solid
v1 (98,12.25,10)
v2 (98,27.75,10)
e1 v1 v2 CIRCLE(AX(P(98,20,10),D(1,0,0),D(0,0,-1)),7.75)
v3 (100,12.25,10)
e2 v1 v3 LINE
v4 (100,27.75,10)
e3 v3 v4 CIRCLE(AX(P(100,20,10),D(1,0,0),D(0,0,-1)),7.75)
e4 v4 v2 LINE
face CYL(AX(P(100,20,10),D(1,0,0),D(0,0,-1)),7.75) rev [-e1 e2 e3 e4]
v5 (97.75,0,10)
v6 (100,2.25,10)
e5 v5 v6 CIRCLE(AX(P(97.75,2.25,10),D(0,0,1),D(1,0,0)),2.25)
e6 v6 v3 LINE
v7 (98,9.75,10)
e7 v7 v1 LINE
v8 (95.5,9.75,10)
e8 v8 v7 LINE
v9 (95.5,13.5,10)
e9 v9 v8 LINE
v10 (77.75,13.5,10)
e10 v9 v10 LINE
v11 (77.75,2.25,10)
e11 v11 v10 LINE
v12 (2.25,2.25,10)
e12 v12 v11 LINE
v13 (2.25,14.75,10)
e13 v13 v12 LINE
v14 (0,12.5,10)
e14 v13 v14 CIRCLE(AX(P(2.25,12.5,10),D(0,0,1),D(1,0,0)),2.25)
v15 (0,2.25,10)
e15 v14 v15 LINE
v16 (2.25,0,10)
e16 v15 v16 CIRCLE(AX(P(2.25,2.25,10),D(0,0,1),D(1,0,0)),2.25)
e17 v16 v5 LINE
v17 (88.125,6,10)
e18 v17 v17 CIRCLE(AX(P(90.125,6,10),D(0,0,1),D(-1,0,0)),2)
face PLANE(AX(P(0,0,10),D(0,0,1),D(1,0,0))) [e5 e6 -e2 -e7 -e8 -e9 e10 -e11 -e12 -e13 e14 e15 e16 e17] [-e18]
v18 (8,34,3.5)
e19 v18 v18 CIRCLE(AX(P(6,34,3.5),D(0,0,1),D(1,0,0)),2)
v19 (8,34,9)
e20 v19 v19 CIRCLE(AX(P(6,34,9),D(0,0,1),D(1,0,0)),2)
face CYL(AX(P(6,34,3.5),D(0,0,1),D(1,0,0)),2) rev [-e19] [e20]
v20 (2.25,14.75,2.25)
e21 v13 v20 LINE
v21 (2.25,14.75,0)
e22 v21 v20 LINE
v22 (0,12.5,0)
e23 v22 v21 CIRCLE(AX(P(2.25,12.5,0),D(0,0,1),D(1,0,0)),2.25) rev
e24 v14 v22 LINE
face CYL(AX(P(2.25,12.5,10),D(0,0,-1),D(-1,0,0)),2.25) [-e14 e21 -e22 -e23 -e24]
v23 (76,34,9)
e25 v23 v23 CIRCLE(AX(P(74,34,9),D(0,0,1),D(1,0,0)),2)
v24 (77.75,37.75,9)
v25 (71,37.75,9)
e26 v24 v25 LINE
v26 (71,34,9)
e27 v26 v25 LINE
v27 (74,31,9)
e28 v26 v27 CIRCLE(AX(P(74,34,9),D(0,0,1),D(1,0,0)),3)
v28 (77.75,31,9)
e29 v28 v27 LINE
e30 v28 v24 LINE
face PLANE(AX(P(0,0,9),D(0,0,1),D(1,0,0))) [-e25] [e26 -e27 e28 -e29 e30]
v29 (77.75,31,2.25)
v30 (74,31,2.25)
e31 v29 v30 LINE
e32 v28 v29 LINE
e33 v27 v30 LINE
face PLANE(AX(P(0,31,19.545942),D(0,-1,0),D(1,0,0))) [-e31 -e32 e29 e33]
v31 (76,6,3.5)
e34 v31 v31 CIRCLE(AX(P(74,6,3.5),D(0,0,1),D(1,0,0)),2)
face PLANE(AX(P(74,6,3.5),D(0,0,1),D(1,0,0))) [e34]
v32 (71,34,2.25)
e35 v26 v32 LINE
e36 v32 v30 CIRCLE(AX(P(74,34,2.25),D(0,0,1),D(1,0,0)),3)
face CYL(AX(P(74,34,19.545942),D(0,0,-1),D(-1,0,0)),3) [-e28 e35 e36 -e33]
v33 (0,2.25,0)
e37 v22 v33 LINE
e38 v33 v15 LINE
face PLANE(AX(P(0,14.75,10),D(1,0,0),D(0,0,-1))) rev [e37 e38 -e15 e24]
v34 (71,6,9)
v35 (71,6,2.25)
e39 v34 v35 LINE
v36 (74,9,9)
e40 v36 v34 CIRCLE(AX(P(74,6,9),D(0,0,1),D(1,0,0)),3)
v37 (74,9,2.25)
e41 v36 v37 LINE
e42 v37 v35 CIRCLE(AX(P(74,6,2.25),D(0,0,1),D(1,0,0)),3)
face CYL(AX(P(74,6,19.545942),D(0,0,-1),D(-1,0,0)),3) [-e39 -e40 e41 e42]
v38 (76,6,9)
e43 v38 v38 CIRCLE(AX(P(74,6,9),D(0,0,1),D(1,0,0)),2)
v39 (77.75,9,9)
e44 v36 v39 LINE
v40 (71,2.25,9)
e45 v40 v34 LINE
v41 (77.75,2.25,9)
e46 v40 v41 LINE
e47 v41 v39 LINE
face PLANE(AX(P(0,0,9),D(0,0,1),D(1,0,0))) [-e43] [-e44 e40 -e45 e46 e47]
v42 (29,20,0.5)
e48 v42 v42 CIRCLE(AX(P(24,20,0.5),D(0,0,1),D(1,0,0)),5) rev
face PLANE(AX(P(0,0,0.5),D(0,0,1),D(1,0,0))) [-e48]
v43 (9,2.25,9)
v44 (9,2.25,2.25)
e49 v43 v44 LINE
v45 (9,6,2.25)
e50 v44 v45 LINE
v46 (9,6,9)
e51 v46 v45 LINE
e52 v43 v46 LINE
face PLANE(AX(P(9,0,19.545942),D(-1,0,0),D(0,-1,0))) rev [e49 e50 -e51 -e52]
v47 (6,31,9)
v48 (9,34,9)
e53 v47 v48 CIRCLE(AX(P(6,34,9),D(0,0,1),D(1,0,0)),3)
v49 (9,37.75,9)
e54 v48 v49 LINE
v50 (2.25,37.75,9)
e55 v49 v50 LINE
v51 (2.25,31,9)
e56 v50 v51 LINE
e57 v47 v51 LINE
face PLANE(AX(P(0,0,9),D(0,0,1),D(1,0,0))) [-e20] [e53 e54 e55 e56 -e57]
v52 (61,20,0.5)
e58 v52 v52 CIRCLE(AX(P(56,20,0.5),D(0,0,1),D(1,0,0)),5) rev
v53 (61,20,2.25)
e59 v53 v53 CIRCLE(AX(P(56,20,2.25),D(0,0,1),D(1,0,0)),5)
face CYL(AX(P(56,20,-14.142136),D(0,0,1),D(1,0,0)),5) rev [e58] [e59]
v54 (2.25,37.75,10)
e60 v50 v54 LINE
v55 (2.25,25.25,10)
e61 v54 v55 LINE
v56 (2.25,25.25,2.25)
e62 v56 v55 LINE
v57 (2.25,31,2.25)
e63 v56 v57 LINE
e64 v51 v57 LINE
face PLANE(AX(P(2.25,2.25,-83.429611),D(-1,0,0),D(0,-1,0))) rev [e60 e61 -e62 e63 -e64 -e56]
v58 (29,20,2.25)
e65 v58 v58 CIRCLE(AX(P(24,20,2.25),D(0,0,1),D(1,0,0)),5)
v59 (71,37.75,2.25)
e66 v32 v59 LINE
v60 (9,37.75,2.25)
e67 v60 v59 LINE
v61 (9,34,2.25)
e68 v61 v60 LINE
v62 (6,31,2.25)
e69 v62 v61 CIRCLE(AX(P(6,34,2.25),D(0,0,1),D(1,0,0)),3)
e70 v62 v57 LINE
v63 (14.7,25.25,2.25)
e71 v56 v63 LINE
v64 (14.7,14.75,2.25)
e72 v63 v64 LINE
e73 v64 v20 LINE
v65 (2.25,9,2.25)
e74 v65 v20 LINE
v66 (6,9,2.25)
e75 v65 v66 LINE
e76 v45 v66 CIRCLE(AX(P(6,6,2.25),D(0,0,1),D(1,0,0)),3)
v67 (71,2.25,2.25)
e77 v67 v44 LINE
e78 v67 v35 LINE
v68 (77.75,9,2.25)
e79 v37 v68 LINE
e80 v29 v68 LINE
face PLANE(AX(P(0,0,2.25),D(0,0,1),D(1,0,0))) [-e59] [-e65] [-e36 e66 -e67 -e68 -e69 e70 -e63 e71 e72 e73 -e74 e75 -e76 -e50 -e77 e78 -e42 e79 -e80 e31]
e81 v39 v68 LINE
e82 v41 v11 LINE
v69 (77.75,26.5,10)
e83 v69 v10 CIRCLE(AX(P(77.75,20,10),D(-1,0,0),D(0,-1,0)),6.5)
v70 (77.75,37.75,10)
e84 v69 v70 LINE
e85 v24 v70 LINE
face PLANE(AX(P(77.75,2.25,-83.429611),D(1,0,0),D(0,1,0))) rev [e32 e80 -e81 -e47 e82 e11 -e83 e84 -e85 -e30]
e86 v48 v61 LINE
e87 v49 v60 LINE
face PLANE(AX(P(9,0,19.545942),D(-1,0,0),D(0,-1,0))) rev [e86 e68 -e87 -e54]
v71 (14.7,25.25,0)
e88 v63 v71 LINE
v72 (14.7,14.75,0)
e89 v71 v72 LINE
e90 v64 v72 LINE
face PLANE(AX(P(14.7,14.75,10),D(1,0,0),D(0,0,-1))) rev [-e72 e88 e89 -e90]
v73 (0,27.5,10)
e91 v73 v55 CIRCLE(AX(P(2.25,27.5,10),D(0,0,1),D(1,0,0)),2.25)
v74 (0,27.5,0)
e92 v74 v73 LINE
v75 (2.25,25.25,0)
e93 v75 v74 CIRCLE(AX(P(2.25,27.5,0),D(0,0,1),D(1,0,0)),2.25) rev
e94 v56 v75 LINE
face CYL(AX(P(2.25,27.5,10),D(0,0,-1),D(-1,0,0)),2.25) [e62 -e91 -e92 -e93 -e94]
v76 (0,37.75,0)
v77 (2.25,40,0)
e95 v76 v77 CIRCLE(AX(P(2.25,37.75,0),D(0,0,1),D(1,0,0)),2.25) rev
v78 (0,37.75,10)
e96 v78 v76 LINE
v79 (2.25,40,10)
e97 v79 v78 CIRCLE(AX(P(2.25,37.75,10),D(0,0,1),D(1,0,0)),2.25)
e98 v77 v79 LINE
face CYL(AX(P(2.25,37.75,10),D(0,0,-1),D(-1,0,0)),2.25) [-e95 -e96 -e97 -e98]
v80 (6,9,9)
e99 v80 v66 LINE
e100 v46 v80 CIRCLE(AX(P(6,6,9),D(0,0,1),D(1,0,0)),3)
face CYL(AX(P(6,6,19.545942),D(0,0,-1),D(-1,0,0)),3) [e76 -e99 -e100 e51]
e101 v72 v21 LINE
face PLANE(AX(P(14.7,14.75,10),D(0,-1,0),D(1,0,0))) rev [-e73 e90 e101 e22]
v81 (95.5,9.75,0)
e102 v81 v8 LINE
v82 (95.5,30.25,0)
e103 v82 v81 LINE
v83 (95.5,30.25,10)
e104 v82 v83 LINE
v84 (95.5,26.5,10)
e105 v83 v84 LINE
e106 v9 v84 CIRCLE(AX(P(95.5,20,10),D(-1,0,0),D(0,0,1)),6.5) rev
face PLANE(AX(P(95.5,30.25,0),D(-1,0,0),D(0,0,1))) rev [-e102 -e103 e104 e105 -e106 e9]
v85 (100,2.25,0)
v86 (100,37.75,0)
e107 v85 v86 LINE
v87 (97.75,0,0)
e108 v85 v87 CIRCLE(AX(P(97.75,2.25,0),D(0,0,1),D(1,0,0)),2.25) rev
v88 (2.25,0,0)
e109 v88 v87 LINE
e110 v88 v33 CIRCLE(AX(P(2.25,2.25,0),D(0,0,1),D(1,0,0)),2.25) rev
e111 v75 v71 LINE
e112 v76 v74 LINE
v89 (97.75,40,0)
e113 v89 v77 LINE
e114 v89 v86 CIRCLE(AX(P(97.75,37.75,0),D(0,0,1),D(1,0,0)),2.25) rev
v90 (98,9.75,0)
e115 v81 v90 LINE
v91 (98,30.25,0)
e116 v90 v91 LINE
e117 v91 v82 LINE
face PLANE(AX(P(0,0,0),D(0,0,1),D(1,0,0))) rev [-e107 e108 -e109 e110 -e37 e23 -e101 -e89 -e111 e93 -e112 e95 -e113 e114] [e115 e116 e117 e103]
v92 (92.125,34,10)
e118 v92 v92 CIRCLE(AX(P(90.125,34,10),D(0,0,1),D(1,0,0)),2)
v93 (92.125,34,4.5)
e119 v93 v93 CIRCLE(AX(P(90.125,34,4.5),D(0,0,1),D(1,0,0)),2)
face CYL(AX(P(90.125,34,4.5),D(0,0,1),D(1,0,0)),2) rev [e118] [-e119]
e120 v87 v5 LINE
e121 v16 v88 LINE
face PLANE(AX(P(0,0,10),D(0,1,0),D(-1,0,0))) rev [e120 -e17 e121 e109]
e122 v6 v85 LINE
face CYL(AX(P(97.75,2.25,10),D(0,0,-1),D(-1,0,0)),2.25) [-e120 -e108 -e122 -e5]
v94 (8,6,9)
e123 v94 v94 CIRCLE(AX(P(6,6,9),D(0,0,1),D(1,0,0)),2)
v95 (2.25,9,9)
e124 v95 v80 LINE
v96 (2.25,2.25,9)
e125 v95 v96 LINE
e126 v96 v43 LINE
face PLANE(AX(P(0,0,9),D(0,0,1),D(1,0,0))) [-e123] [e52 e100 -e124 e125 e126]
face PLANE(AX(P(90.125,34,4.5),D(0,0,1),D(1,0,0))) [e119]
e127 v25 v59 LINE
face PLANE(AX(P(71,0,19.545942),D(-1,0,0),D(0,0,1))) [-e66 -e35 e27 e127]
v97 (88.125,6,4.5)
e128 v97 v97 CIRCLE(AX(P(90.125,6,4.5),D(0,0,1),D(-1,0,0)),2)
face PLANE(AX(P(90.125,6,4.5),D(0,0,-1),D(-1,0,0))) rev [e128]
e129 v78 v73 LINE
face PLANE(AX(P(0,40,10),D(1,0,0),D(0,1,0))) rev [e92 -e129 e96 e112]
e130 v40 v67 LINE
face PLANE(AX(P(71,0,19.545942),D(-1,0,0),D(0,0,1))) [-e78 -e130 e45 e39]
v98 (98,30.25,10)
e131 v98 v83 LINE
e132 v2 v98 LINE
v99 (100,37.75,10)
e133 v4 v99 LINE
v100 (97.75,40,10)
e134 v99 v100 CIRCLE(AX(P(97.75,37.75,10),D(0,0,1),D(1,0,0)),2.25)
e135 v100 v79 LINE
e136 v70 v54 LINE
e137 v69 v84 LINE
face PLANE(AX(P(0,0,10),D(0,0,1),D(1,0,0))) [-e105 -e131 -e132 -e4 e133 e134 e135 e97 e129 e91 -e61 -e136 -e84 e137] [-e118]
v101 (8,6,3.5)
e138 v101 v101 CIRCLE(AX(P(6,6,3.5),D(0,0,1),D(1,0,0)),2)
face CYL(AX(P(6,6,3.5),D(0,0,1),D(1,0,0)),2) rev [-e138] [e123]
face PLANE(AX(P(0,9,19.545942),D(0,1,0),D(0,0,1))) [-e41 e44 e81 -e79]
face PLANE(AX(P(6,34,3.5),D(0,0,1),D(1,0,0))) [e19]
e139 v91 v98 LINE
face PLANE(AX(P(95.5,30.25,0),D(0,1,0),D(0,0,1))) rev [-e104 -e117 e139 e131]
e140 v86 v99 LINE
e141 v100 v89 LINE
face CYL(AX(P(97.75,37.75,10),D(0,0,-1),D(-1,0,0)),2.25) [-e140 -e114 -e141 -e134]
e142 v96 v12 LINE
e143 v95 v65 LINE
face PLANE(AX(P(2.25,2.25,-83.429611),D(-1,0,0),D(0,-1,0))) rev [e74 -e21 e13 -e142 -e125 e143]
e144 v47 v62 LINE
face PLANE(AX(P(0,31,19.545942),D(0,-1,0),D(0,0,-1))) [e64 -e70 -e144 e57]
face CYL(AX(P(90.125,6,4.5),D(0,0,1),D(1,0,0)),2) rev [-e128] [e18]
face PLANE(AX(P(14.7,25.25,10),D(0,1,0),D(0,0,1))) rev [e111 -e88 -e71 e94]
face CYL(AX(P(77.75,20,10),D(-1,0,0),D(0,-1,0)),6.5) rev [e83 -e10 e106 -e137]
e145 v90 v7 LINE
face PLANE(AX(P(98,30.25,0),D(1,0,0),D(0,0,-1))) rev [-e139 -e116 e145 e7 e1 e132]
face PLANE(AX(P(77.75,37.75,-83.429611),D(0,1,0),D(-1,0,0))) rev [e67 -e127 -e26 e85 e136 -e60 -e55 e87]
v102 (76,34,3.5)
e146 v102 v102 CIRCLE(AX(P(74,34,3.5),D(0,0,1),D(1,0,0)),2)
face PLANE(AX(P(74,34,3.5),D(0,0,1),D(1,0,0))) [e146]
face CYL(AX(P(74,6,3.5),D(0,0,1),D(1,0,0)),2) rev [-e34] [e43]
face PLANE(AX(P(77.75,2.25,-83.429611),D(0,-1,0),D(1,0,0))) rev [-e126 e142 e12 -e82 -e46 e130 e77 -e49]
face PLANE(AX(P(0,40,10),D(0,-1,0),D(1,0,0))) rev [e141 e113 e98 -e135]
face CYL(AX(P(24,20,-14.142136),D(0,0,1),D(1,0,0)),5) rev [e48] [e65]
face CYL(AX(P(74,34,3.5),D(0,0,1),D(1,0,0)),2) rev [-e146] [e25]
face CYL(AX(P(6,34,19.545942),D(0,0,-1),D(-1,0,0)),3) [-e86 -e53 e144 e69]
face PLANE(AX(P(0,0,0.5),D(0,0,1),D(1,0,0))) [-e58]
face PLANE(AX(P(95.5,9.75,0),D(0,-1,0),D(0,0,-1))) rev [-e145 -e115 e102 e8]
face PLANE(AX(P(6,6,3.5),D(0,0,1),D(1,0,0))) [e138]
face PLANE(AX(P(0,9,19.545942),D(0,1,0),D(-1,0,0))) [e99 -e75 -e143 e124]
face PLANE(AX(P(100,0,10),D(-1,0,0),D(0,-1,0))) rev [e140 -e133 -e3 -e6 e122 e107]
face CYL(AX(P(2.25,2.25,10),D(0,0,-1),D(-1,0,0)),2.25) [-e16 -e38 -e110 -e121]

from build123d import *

# Parameters (mm, degrees)
BODY_DEPTH          = 10
SKETCH10_W          = 75.5
SKETCH10_H          = 35.5
PCB_RECESS_DEPTH    = 7.75
SKETCH11_R          = 3
PCB_BOSS_DEPTH      = 6.75
FILLET2_R           = 2.25
SKETCH12_R          = 2
M3_INSERTS_DEPTH    = 5.5
FILLET3_R           = 2.25
SKETCH27_R          = 5
MAGNETS_DEPTH       = 1.75
SKETCH29_W          = 2
SKETCH29_H          = 7.75
SKETCH30_W          = 2.5
SKETCH30_H          = 20.5
HIROSE_MID_DEPTH    = 109.166538264
SKETCH31_R          = 2
CUT_EXTRUDE14_DEPTH = 5.5
SKETCH32_W          = 17.75
SKETCH32_H          = 6.5


with BuildPart() as part:
    # Sketch4 → body (new body)
    with BuildSketch(Plane.XY):
        Polygon((0, 40), (0, 25.25), (14.7, 25.25), (14.7, 14.75), (0, 14.75), (0, 0), (100, 0), (100, 40), align=None)
    extrude(amount=BODY_DEPTH)

    # Sketch10 → pcb-recess (cut)
    with BuildSketch(Plane.XY.offset(10)):
        with Locations((40, 20)):
            Rectangle(SKETCH10_W, SKETCH10_H)
    extrude(amount=-PCB_RECESS_DEPTH, mode=Mode.SUBTRACT)

    # Sketch11 → pcb-boss (add)
    with BuildSketch(Plane.XY.offset(2.25)):
        with Locations((6, 34)):
            Circle(SKETCH11_R)
        with BuildLine():
            ThreePointArc((6, 31), (3.878679656, 36.121320344), (9, 34))
            Line((9, 34), (9, 37.75))
            Line((9, 37.75), (2.25, 37.75))
            Line((2.25, 37.75), (2.25, 31))
            Line((2.25, 31), (6, 31))
        make_face()
        with BuildLine():
            Line((77.75, 37.75), (71, 37.75))
            Line((71, 37.75), (71, 34))
            ThreePointArc((71, 34), (74, 37), (77, 34))
            ThreePointArc((77, 34), (76.121320344, 31.878679656), (74, 31))
            Line((74, 31), (77.75, 31))
            Line((77.75, 31), (77.75, 37.75))
        make_face()
        with Locations((74, 34)):
            Circle(SKETCH11_R)
        with Locations((74, 6)):
            Circle(SKETCH11_R)
        with BuildLine():
            Line((77.75, 2.25), (77.75, 9))
            Line((77.75, 9), (74, 9))
            ThreePointArc((74, 9), (76.121320344, 8.121320344), (77, 6))
            ThreePointArc((77, 6), (74, 3), (71, 6))
            Line((71, 6), (71, 2.25))
            Line((71, 2.25), (77.75, 2.25))
        make_face()
        with Locations((6, 6)):
            Circle(SKETCH11_R)
        with BuildLine():
            Line((2.25, 2.25), (9, 2.25))
            Line((9, 2.25), (9, 6))
            ThreePointArc((9, 6), (3.878679656, 3.878679656), (6, 9))
            Line((6, 9), (2.25, 9))
            Line((2.25, 9), (2.25, 2.25))
        make_face()
    extrude(amount=PCB_BOSS_DEPTH)

    # Fillet2
    fillet2_edges = [part.edges().sort_by_distance(p)[0] for p in [
        (0, 14.75, 5),
        (0, 25.25, 5),
    ]]
    fillet(fillet2_edges, radius=FILLET2_R - 0.0001)  # a hair under: the kernel refuses the full size

    # Sketch12 → m3-inserts (cut)
    with BuildSketch(Plane.XY.offset(9)):
        with Locations((6, 34)):
            Circle(SKETCH12_R)
        with Locations((74, 34)):
            Circle(SKETCH12_R)
        with Locations((74, 6)):
            Circle(SKETCH12_R)
        with Locations((6, 6)):
            Circle(SKETCH12_R)
    extrude(amount=-M3_INSERTS_DEPTH, mode=Mode.SUBTRACT)

    # Fillet3
    fillet3_edges = [part.edges().sort_by_distance(p)[0] for p in [
        (0, 40, 5),
        (100, 40, 5),
        (100, 0, 5),
        (0, 0, 5),
    ]]
    fillet(fillet3_edges, radius=FILLET3_R)

    # Sketch27 → magnets (cut)
    with BuildSketch(Plane.XY.offset(2.25)):
        with Locations((24, 20)):
            Circle(SKETCH27_R)
        with Locations((56, 20)):
            Circle(SKETCH27_R)
    extrude(amount=-MAGNETS_DEPTH, mode=Mode.SUBTRACT)

    # Sketch29 → hirose-front (revolve, cut)
    with BuildSketch(Plane.XY.offset(10)):
        with Locations((99, 23.875)):
            Rectangle(SKETCH29_W, SKETCH29_H)
    revolve(axis=Axis((100, 20, 10), (-1, 0, 0)), mode=Mode.SUBTRACT)

    # Sketch30 → hirose-mid (cut, through all)
    with BuildSketch(Plane.XY.offset(10)):
        with Locations((96.75, 20)):
            Rectangle(SKETCH30_W, SKETCH30_H)
    extrude(amount=-HIROSE_MID_DEPTH, mode=Mode.SUBTRACT)

    # Sketch31 → Cut-Extrude14 (cut)
    with BuildSketch(Plane.XY.offset(10)):
        with Locations((90.125, 34)):
            Circle(SKETCH31_R)
        with Locations(Location((90.125, 6, 0), (0, 0, 180))):
            Circle(SKETCH31_R)
    extrude(amount=-CUT_EXTRUDE14_DEPTH, mode=Mode.SUBTRACT)

    # Sketch32 → hirose-back (revolve, cut)
    with BuildSketch(Plane.XY.offset(10)):
        with Locations((86.625, 23.25)):
            Rectangle(SKETCH32_W, SKETCH32_H)
    revolve(axis=Axis((77.75, 20, 10), (1, 0, 0)), mode=Mode.SUBTRACT)


solid = part.part
